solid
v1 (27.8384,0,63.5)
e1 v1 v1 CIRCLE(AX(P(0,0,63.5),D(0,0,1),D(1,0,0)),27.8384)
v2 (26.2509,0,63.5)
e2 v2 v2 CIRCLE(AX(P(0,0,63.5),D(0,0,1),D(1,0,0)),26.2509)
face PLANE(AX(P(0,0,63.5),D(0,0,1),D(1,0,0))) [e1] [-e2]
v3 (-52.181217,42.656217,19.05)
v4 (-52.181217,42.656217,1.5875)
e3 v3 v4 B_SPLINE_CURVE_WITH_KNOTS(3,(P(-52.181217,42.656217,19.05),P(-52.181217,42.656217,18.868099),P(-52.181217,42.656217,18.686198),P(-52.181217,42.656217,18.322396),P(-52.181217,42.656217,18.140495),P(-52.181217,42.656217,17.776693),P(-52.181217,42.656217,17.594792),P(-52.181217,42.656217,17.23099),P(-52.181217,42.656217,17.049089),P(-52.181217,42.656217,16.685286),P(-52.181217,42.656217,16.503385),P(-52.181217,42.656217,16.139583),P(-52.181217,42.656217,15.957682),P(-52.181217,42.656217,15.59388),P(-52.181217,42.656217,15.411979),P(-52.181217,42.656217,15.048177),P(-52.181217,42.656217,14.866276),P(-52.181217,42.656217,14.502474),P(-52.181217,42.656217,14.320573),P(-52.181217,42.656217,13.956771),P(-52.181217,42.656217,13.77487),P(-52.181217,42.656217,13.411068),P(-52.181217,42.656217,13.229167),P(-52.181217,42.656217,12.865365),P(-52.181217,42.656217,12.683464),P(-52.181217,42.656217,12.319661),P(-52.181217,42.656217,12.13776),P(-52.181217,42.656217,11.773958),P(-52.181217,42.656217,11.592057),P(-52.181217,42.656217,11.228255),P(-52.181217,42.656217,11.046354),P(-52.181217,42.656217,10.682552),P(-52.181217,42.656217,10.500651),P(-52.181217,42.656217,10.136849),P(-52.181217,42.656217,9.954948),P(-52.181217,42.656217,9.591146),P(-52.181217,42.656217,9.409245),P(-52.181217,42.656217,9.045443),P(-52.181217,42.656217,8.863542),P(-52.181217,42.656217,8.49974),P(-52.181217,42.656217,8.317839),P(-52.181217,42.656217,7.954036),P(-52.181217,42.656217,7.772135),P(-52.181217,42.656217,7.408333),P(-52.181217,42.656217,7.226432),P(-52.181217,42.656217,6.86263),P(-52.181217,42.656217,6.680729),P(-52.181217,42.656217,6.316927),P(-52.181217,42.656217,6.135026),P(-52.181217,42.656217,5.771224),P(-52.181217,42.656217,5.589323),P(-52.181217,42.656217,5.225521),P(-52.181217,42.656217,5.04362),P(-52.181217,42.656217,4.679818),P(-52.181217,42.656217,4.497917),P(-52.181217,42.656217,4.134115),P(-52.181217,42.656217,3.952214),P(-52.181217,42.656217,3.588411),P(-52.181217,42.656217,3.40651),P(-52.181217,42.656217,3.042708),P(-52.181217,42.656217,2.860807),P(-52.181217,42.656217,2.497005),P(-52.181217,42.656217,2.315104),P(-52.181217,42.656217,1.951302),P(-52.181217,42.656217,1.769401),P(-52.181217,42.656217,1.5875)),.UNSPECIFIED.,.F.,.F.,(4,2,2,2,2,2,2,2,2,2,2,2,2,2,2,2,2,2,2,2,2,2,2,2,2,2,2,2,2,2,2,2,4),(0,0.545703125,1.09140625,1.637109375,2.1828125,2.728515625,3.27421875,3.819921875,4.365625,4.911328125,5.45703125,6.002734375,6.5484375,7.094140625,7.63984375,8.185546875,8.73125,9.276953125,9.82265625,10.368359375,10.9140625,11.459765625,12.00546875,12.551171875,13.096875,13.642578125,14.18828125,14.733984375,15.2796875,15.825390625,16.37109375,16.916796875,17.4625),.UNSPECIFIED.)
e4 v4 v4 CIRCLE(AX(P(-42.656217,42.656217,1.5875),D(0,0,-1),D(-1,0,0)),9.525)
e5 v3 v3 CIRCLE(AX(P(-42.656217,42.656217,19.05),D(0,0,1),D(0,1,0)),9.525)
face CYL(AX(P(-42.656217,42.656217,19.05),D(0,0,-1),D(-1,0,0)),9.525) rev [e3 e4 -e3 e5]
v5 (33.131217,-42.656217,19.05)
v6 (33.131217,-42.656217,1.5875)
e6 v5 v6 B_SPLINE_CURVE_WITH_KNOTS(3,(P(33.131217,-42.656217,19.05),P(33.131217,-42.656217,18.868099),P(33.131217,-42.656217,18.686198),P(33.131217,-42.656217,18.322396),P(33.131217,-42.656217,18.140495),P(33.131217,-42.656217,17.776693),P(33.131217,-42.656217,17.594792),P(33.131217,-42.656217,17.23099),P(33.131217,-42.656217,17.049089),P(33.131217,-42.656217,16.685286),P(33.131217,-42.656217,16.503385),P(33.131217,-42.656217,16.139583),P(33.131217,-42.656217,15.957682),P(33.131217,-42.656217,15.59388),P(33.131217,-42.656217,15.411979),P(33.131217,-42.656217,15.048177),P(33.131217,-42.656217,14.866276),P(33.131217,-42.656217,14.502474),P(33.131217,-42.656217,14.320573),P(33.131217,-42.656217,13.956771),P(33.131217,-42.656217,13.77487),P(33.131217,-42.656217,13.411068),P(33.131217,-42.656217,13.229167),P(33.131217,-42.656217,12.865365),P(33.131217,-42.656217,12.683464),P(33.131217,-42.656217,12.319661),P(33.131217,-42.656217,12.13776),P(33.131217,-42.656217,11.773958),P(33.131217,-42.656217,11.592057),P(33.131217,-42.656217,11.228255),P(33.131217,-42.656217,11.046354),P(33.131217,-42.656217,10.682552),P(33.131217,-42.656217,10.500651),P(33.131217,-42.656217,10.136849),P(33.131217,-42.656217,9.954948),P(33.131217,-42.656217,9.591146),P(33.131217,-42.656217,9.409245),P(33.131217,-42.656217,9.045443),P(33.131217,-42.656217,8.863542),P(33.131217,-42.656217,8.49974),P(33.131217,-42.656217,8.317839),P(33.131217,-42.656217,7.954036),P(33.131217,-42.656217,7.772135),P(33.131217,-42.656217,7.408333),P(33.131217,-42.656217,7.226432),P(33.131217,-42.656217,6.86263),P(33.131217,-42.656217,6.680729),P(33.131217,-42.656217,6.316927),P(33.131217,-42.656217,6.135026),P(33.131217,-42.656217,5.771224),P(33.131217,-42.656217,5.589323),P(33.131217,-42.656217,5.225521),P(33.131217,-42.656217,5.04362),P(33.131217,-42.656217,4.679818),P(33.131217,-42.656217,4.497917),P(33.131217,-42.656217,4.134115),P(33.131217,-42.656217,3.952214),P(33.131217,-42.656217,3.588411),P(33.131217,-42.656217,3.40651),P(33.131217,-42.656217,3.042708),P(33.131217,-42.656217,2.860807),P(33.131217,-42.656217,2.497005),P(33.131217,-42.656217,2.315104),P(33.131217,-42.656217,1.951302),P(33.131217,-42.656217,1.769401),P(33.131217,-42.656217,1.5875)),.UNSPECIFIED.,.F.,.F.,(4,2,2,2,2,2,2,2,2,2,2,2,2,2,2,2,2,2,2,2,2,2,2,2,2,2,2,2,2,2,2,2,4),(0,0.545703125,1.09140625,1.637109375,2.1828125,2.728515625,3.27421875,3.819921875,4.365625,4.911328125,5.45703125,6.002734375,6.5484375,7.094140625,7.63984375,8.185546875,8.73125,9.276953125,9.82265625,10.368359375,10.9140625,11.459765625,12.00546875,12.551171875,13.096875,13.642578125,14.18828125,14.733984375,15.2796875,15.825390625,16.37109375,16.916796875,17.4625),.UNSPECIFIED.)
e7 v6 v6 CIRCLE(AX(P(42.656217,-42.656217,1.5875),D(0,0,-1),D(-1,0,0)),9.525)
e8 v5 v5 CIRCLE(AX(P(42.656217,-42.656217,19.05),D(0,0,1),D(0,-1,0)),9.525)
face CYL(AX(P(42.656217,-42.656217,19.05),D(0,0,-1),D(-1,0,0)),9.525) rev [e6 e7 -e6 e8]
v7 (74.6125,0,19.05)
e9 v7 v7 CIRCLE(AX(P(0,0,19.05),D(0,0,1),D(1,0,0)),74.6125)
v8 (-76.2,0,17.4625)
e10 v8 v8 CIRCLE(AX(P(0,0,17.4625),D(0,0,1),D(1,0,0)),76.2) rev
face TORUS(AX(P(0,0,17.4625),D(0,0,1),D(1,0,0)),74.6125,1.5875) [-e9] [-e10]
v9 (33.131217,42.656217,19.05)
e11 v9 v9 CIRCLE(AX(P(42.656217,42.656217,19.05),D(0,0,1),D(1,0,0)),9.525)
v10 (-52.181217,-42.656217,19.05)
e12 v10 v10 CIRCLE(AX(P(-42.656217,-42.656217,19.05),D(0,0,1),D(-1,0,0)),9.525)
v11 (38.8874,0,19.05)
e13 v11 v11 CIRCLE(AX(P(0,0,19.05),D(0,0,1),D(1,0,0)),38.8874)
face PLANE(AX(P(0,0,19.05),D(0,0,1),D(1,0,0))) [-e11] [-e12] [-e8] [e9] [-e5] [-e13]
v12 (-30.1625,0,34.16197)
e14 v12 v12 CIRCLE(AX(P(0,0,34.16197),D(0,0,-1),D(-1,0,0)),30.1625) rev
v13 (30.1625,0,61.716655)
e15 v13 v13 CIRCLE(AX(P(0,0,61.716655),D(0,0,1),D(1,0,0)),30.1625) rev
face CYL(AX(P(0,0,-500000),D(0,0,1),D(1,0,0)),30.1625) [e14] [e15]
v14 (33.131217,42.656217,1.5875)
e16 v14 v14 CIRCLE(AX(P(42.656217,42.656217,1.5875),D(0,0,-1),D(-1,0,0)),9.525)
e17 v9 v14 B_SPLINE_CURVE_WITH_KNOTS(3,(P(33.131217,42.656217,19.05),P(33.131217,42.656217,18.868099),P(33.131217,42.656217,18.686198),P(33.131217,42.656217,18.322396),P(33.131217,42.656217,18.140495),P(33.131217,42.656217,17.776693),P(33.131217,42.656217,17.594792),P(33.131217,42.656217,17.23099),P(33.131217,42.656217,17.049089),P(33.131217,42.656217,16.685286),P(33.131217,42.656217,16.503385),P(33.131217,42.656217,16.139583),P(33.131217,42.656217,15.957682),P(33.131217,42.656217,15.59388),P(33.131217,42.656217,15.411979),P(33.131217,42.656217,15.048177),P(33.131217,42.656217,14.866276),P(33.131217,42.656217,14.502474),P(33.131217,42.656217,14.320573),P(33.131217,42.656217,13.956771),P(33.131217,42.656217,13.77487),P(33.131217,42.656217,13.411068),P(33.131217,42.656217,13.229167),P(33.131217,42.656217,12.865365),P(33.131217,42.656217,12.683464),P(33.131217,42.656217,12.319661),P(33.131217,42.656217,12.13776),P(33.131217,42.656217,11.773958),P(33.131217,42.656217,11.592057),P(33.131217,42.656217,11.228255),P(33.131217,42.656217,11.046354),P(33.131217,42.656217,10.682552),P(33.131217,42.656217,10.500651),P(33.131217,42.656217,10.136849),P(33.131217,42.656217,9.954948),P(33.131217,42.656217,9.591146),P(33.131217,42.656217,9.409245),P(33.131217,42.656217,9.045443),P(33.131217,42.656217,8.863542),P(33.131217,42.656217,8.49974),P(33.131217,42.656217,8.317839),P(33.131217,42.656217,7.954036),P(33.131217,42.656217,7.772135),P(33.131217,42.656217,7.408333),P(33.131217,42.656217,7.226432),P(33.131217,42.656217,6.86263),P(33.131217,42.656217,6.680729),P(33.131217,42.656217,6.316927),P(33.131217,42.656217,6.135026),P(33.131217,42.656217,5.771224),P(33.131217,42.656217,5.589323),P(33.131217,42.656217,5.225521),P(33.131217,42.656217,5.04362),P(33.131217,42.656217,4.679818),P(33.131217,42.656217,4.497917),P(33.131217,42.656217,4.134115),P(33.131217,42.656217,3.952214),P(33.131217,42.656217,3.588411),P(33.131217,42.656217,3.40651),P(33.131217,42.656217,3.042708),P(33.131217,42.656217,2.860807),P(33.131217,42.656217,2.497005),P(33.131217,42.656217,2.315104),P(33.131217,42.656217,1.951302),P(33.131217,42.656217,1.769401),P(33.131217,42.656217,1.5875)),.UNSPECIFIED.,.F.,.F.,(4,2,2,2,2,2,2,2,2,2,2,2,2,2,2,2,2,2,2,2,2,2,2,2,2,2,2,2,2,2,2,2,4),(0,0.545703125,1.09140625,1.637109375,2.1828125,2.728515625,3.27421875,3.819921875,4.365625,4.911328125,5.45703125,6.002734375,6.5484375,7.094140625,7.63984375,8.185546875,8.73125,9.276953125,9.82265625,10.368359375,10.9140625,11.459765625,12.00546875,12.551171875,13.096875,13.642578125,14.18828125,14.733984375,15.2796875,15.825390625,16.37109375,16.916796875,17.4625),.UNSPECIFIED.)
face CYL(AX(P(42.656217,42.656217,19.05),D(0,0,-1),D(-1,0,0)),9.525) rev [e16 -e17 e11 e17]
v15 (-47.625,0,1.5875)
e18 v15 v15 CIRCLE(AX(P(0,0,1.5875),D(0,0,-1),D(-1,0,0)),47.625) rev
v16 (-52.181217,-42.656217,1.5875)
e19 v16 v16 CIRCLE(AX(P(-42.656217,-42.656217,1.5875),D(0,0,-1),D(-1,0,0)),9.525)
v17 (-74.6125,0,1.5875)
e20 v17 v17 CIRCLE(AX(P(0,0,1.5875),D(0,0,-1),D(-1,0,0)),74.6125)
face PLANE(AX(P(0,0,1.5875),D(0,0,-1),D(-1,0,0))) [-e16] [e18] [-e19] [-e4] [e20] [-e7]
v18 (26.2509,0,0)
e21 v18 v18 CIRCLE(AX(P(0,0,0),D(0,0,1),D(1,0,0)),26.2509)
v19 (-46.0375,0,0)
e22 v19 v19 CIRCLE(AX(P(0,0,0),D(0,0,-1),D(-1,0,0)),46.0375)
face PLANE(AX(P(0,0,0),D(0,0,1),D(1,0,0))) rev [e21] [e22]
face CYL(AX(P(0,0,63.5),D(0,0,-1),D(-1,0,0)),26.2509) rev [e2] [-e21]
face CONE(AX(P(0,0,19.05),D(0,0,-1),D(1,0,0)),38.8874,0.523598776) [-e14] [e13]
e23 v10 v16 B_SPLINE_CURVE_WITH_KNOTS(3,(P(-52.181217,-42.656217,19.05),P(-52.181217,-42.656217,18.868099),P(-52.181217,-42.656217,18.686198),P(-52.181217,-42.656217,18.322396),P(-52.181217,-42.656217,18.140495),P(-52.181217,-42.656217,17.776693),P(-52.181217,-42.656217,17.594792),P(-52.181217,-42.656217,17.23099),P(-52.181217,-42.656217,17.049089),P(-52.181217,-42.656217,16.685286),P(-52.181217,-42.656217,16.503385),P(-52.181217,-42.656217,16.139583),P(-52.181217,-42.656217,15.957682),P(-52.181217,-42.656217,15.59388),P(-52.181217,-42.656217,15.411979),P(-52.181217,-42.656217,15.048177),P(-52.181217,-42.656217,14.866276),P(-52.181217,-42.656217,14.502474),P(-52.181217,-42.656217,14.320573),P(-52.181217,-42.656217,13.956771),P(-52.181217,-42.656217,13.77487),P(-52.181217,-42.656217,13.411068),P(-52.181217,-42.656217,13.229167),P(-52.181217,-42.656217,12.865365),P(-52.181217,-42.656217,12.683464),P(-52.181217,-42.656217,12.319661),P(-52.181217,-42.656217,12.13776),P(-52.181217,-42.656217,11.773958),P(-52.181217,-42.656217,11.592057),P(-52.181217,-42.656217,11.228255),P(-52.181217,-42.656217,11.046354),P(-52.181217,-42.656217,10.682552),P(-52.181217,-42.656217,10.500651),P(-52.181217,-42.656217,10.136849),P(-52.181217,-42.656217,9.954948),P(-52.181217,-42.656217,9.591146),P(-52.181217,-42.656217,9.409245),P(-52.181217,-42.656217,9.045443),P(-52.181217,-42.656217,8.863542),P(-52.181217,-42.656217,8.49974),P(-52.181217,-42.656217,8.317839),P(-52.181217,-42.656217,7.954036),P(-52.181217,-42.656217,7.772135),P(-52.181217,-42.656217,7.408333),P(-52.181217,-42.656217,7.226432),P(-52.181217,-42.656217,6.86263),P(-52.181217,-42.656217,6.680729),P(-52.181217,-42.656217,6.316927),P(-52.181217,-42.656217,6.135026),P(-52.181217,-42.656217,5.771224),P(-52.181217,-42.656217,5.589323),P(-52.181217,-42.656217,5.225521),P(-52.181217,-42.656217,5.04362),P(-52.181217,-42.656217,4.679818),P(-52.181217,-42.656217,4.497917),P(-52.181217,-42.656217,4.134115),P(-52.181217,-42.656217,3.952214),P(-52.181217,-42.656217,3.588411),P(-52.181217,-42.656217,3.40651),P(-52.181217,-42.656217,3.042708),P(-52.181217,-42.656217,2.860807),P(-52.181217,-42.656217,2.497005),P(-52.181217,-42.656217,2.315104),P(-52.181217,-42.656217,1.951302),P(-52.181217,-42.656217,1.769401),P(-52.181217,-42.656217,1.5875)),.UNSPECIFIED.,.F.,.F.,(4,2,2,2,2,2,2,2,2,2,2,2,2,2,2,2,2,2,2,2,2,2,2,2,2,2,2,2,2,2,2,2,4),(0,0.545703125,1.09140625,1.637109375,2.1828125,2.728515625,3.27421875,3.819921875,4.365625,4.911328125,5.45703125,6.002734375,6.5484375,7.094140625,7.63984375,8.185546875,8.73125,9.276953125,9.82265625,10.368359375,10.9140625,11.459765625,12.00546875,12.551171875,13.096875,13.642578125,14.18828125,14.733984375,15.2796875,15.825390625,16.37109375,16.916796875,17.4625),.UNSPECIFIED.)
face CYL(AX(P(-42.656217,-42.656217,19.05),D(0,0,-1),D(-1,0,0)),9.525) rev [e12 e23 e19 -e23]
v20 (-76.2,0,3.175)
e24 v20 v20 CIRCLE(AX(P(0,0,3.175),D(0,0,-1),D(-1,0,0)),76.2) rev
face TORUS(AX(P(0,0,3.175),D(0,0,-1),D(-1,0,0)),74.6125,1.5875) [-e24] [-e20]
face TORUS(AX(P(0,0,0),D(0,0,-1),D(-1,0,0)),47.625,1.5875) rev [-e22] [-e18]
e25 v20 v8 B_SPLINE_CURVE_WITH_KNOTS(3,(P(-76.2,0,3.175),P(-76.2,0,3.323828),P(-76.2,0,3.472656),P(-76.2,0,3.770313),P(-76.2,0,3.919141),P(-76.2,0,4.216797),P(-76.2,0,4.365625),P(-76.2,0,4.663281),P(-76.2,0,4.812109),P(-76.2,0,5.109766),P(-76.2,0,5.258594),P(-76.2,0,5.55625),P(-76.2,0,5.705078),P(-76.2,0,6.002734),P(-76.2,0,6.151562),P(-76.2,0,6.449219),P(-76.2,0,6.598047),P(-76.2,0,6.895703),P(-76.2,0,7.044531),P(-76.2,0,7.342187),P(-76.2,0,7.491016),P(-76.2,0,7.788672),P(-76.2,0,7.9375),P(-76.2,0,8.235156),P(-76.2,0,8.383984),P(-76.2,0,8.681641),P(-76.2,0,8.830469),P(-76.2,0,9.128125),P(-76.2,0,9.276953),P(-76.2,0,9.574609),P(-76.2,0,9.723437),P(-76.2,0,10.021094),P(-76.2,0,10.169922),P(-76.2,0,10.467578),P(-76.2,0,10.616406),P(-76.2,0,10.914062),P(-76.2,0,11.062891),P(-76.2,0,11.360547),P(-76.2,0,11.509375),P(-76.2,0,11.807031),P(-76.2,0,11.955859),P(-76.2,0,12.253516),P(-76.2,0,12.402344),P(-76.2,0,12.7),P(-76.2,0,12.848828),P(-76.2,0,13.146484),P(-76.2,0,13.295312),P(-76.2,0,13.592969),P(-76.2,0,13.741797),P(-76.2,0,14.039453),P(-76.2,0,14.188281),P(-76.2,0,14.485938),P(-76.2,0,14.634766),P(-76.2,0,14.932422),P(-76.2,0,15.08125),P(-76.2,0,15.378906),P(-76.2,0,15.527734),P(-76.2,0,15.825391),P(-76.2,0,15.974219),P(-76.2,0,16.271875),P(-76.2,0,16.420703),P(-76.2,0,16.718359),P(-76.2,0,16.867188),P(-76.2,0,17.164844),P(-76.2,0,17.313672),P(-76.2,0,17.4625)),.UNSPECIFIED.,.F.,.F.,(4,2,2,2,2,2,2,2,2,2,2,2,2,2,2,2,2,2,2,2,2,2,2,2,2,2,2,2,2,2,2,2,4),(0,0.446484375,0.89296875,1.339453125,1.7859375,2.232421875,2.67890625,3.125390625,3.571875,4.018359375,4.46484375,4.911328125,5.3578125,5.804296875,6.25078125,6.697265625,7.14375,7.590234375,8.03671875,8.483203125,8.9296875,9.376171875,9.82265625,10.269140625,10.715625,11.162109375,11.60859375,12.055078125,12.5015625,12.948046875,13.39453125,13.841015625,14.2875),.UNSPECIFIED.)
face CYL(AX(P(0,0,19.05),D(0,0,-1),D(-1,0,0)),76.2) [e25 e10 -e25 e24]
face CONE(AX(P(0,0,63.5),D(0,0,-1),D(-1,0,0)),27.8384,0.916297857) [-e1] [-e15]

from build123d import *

# Parameters (mm, degrees)
SKETCH1_R                 = 76.2
BOSS_EXTRUDE1_DEPTH       = 19.05
SKETCH2_R                 = 9.525
BOLTHOLE_DEPTH            = 110.433918417
BOLTHOLEPATTERN_COUNT     = 4
SKETCH5_OUTSIDE_W         = 197.674
SKETCH5_OUTSIDE_H         = 197.674
SKETCH5_OUTSIDE_R         = 46.0375
RAISED_FACE_DEPTH         = 1.5875
SKETCH8_R                 = 38.8874
WELD_NECK_120_DRAFT_DEPTH = 44.45
WELD_NECK_120_DRAFT_TAPER = 30
WELD_NECK_END_REACH       = 127.08
SKETCH9_R                 = 30.1625
WELD_NECK_CHAMFER1_SIZE   = 1.783344653
WELD_NECK_CHAMFER1_SIZE2  = 2.3241
SKETCH7_R                 = 26.2509
BORE_DEPTH                = 126.080494083
FILLET2_R                 = 1.5875
FILLET3_R                 = 1.5875


with BuildPart() as part:
    # Sketch1 → Boss-Extrude1 (new body)
    with BuildSketch(Plane.XY):
        with Locations(Location((0, 0, 0), (0, 0, 180))):
            Circle(SKETCH1_R)
    extrude(amount=BOSS_EXTRUDE1_DEPTH)

    # Sketch2 → BoltHole (cut, through all)
    with BuildSketch(Plane.XY):
        with Locations(Location((42.656216575, 42.656216575, 0), (0, 0, 180))):
            Circle(SKETCH2_R)
    bolthole = extrude(amount=BOLTHOLE_DEPTH, mode=Mode.SUBTRACT)

    # BoltHolePattern: BoltHole ×4 about axis
    boltholepattern_axis = Axis((0, 0, 0), (0, 0, 1))
    for i in range(1, BOLTHOLEPATTERN_COUNT):
        add(bolthole.rotate(boltholepattern_axis, i * 360 / BOLTHOLEPATTERN_COUNT), mode=Mode.SUBTRACT)

    # Sketch5 outside → Raised Face (cut)
    with BuildSketch(Plane(origin=(0, 0, 0), x_dir=(-1, 0, 0), z_dir=(0, 0, -1))):
        Rectangle(SKETCH5_OUTSIDE_W, SKETCH5_OUTSIDE_H)
        Circle(SKETCH5_OUTSIDE_R, mode=Mode.SUBTRACT)
    extrude(amount=-RAISED_FACE_DEPTH, mode=Mode.SUBTRACT)

    # Sketch8 → Weld Neck 120 Draft (add)
    with BuildSketch(Plane.XY.offset(19.05)):
        Circle(SKETCH8_R)
    extrude(amount=WELD_NECK_120_DRAFT_DEPTH, taper=WELD_NECK_120_DRAFT_TAPER)

    # Sketch9 → Weld Neck End (add, up to next)
    with BuildSketch(Plane.XY.offset(63.5), mode=Mode.PRIVATE) as weld_neck_end_sk1:
        Circle(SKETCH9_R)
    weld_neck_end_tool1 = extrude(weld_neck_end_sk1.sketch, amount=-WELD_NECK_END_REACH, mode=Mode.PRIVATE) - part.part
    add(weld_neck_end_tool1.solids().sort_by_distance((0, 0, 63.5))[0])

    # Weld Neck Chamfer1
    weld_neck_chamfer1_edges = [part.edges().sort_by_distance(p)[0] for p in [
        (-30.1625, 0, 63.5),
    ]]
    weld_neck_chamfer1_side = [part.faces().sort_by_distance(p)[0] for p in [
        (-30.1625, 0, 48.830985045),
    ]]
    chamfer(weld_neck_chamfer1_edges, length=WELD_NECK_CHAMFER1_SIZE, length2=WELD_NECK_CHAMFER1_SIZE2, reference=weld_neck_chamfer1_side[0])

    # Sketch7 → Bore (cut, through all)
    with BuildSketch(Plane.XY):
        Circle(SKETCH7_R)
    extrude(amount=BORE_DEPTH, mode=Mode.SUBTRACT)

    # Fillet2
    fillet2_edges = [part.edges().sort_by_distance(p)[0] for p in [
        (76.2, 0, 1.5875),
        (76.2, 0, 19.05),
    ]]
    fillet(fillet2_edges, radius=FILLET2_R)

    # Fillet3
    fillet3_edges = [part.edges().sort_by_distance(p)[0] for p in [
        (46.0375, 0, 1.5875),
    ]]
    fillet(fillet3_edges, radius=FILLET3_R - 0.0001)  # a hair under: the kernel refuses the full size


solid = part.part
